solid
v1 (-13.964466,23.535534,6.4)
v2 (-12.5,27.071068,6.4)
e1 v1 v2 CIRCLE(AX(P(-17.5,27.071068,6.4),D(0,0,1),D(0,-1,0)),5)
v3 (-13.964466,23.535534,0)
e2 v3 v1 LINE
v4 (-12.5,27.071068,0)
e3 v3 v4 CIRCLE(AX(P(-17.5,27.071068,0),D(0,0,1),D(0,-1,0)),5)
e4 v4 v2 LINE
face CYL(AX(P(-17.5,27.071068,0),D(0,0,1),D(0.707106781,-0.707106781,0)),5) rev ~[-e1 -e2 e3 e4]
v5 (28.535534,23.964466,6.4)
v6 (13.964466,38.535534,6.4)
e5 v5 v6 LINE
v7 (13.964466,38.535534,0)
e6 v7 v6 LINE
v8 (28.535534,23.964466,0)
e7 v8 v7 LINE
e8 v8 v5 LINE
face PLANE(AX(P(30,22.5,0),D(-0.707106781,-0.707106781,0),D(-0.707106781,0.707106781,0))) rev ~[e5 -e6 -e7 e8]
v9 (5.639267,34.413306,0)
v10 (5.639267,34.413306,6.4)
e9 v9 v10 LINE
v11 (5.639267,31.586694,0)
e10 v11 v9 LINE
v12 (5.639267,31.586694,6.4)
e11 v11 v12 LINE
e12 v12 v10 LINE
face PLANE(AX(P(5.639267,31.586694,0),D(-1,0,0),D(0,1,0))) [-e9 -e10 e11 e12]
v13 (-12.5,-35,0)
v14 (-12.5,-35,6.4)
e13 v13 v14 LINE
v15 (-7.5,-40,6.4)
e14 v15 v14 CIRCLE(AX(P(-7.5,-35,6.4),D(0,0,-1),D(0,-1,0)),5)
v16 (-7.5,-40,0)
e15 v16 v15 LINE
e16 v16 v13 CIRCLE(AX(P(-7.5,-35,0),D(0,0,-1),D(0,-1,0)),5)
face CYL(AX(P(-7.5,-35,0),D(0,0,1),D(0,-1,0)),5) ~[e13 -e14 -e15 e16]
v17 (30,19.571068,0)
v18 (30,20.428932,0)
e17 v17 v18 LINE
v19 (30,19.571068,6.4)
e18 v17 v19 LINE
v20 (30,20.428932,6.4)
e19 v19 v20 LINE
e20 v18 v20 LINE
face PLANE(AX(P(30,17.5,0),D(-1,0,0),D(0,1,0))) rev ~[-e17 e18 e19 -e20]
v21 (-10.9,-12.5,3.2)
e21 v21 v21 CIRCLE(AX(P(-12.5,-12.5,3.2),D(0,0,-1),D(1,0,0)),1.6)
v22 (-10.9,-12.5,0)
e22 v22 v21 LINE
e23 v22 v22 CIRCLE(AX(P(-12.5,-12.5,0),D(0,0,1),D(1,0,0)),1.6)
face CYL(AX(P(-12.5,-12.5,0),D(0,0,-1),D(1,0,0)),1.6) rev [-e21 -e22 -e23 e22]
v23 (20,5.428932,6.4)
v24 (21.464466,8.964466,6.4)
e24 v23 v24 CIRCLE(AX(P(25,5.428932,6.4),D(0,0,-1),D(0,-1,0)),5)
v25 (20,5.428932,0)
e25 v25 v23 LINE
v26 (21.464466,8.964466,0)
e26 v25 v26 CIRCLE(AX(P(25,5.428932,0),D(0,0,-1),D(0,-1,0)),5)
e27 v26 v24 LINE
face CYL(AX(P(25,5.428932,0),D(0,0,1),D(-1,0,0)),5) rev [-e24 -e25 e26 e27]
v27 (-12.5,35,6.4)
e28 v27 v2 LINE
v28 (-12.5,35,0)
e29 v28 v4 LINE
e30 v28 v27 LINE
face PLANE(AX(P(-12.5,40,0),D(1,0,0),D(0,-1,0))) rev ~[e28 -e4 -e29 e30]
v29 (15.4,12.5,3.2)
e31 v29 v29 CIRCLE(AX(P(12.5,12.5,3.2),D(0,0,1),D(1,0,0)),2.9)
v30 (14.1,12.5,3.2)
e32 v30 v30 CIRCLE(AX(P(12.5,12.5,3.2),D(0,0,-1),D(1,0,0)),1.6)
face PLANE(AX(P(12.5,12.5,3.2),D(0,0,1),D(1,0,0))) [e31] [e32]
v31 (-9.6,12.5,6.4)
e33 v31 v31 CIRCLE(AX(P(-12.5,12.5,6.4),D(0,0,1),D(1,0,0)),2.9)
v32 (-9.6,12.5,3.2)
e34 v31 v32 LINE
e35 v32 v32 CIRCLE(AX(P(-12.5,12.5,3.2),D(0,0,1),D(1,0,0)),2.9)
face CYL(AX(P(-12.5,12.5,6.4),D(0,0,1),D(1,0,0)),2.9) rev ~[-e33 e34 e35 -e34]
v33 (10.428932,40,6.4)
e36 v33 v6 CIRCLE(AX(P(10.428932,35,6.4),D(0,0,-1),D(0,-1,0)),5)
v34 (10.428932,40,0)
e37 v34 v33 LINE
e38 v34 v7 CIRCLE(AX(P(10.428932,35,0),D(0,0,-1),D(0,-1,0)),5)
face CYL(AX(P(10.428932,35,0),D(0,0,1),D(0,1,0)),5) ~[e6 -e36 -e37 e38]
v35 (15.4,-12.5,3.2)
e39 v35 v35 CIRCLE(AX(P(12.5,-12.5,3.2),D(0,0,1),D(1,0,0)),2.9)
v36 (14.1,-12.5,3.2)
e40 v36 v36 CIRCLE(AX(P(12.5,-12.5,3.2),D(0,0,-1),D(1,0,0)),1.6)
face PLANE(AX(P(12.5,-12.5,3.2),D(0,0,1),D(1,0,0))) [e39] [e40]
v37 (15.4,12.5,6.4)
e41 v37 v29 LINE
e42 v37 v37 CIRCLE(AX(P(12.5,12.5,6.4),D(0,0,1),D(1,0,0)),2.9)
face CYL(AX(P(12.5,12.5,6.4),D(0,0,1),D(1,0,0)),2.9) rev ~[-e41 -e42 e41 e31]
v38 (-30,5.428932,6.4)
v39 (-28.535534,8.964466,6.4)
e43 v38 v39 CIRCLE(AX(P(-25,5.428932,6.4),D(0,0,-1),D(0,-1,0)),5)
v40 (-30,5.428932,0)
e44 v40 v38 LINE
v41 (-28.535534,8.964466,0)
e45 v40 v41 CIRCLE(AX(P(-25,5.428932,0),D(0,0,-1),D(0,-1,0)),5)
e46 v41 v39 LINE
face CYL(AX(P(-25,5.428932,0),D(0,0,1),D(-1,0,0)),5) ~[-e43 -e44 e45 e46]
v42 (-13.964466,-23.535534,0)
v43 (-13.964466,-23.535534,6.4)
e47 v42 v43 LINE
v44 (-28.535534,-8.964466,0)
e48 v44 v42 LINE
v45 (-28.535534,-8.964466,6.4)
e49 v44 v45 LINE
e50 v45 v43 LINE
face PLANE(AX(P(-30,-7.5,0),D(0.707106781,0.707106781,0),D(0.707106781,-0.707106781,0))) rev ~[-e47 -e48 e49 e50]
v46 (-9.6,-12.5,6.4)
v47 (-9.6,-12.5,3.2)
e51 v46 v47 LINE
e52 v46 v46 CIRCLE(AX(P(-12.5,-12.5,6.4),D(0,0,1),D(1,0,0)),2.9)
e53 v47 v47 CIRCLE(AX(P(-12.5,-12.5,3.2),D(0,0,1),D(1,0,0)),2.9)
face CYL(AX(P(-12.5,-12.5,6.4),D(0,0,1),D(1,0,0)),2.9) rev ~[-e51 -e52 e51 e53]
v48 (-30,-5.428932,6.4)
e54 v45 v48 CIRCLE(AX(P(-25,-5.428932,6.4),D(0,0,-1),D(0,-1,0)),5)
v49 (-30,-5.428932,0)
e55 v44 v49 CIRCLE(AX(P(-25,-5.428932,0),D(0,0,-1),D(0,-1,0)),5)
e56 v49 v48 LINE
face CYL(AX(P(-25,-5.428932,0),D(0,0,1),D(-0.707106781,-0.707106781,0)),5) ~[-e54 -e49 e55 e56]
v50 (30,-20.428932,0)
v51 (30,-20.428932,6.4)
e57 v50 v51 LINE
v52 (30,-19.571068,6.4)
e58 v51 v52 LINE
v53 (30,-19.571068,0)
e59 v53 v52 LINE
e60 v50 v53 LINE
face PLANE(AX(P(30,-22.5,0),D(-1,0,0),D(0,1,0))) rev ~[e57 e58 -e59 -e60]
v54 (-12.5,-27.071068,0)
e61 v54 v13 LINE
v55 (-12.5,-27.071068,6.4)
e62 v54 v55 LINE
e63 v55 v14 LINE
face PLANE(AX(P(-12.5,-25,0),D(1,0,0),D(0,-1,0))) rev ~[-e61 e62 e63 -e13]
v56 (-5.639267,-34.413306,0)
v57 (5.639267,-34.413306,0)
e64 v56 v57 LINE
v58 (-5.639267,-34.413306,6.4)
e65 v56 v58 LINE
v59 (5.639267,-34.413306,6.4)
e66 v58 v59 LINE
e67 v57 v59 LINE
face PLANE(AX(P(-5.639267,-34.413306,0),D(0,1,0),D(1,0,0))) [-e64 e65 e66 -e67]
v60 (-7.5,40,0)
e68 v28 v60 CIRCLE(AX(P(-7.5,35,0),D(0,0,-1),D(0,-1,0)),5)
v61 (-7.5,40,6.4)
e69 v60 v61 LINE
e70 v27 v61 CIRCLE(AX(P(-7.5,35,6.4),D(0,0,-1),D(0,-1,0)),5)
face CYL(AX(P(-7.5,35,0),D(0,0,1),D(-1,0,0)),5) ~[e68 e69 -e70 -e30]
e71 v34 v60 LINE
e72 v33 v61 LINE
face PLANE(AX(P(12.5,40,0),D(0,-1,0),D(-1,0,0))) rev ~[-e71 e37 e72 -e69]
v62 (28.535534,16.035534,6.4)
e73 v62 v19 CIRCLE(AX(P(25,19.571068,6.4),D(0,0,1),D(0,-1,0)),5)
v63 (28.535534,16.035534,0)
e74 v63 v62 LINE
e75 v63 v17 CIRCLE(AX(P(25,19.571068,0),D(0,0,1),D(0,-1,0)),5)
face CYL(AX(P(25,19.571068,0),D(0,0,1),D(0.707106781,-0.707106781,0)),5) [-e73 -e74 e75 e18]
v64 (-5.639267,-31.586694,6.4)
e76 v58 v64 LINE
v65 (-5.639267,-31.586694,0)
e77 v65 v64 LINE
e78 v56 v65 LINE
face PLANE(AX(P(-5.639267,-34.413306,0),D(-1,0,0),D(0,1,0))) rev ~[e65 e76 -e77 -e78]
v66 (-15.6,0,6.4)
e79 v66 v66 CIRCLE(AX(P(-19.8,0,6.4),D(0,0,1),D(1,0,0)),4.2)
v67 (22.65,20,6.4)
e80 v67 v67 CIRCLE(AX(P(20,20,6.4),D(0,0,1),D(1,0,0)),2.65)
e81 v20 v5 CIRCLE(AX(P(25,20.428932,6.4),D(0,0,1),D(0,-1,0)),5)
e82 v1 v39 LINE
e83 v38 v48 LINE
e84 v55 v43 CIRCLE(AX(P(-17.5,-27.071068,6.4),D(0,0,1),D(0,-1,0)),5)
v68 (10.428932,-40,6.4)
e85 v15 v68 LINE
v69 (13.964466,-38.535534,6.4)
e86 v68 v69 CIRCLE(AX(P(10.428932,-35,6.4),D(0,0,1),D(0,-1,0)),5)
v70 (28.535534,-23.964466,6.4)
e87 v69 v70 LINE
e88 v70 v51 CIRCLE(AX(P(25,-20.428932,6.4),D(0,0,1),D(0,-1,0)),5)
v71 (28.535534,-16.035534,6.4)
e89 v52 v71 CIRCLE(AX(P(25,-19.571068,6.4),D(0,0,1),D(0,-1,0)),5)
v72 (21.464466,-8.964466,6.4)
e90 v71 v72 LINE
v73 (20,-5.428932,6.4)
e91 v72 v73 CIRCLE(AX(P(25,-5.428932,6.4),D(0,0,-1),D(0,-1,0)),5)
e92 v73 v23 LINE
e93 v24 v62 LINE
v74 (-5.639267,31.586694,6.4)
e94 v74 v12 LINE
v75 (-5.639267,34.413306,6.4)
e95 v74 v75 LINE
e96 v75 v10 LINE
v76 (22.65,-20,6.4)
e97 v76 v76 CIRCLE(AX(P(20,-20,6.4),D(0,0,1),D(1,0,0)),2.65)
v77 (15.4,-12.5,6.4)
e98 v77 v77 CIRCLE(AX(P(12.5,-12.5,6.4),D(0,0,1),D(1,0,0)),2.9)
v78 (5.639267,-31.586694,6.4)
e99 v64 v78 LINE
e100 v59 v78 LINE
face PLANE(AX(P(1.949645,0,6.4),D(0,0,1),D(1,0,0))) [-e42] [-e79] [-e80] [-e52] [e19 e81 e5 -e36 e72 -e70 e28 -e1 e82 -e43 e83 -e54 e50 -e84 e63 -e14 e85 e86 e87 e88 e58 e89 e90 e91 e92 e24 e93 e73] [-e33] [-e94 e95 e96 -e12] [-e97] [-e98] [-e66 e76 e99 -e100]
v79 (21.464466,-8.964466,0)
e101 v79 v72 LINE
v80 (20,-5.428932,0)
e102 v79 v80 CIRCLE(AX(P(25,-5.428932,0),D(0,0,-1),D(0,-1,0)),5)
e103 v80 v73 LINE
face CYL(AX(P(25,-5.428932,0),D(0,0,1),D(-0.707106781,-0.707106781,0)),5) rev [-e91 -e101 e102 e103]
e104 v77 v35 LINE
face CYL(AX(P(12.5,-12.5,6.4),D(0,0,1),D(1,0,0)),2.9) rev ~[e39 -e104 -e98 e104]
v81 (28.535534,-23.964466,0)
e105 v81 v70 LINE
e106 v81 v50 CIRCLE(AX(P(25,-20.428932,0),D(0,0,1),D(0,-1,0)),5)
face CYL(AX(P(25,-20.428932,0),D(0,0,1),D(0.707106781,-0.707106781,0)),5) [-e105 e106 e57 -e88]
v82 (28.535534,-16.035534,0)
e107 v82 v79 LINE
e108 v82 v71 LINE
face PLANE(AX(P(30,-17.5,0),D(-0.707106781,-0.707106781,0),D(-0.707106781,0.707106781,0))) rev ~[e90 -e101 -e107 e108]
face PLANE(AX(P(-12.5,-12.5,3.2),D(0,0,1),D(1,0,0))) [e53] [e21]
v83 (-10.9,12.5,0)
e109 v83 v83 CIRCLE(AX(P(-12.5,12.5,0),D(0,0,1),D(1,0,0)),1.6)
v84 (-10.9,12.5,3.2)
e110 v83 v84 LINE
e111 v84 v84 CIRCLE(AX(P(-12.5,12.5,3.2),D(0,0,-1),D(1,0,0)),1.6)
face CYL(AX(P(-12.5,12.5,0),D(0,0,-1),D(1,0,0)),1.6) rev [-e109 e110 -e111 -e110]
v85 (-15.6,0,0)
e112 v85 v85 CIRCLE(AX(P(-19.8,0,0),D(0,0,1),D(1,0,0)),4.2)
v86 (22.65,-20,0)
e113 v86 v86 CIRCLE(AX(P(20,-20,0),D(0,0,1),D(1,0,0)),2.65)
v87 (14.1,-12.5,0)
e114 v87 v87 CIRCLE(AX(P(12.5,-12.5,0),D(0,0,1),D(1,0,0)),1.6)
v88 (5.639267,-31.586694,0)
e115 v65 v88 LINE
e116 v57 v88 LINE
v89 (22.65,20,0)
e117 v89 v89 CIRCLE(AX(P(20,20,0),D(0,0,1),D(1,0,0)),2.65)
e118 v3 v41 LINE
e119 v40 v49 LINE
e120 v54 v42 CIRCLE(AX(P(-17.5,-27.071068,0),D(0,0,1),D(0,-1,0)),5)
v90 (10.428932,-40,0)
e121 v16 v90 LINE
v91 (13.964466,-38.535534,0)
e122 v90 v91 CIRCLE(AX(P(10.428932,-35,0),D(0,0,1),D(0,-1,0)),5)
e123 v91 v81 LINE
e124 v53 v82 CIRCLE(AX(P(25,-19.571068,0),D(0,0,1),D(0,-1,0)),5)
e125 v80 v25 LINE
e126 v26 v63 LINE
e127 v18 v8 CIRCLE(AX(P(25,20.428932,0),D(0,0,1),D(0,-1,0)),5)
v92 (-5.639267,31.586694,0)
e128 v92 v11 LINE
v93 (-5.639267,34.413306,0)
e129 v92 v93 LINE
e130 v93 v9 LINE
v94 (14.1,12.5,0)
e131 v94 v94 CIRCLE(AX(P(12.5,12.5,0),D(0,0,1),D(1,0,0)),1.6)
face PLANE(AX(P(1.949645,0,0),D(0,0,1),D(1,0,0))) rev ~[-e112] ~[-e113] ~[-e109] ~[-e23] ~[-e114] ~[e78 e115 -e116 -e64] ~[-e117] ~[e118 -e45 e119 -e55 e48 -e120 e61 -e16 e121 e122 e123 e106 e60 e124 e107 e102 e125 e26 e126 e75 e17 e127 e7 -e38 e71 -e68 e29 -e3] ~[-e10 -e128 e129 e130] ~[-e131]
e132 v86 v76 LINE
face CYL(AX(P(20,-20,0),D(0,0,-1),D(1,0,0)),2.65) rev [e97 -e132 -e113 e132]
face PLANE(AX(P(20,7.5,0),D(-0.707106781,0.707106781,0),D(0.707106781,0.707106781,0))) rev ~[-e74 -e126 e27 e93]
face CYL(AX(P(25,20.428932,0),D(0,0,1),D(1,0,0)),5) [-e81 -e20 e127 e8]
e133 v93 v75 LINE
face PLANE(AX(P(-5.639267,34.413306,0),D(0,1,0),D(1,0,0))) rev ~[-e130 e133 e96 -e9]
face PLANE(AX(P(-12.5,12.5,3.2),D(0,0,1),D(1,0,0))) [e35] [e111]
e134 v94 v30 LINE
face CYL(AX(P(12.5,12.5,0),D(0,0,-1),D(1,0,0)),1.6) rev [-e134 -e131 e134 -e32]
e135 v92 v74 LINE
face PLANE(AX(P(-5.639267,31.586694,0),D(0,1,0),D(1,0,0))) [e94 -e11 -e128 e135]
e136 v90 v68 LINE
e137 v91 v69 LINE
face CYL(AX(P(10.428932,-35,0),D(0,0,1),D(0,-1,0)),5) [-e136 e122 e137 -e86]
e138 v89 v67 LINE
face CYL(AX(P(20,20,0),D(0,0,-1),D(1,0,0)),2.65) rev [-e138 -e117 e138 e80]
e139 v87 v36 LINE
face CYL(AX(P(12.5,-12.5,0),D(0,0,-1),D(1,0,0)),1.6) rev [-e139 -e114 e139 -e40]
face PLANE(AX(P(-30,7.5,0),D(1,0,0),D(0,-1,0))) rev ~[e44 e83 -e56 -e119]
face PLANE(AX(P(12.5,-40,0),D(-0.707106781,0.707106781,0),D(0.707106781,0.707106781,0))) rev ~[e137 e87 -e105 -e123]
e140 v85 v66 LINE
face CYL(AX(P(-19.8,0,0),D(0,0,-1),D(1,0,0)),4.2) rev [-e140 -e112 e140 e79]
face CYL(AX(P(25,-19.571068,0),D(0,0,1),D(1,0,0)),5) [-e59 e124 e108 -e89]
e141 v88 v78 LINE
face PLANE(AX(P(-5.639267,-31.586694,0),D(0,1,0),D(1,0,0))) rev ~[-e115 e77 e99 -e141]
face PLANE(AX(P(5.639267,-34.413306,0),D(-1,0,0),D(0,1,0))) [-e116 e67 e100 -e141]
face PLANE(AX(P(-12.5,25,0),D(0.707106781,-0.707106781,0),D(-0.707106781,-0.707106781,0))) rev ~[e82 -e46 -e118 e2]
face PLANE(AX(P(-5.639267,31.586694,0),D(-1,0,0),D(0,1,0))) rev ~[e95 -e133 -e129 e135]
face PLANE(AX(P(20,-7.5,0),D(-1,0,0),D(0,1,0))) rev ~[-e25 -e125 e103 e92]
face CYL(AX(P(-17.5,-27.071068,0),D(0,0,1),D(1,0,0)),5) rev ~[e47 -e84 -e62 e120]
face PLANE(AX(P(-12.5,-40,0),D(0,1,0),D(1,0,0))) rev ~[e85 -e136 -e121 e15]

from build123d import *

# Parameters (mm, degrees)
F0_R     = 1.6
F0_W     = 11.2785340156
F0_H     = 2.8266120087
F0_R_2   = 2.65
F0_R_3   = 4.2
F1_DEPTH = 6.4
F2_R     = 5
F3_R     = 2.9
F4_DEPTH = 3.2


# Not quite as in the source:
# - a feature names something its author has since deleted; it is built from what else it names


with BuildPart() as f1:
    # F0 (on Top) → F1 (new body)
    with BuildSketch(Plane.XY):
        Polygon((-12.5, -40), (12.5, -40), (30, -22.5), (30, -17.5), (20, -7.5), (20, 7.5), (30, 17.5), (30, 22.5), (12.5, 40), (-12.5, 40), (-12.5, 25), (-30, 7.5), (-30, -7.5), (-12.5, -25), align=None)
        with Locations((-12.5, -12.5)):
            Circle(F0_R, mode=Mode.SUBTRACT)
        with Locations((0, -33)):
            Rectangle(F0_W, F0_H, mode=Mode.SUBTRACT)
        with Locations((12.5, -12.5)):
            Circle(F0_R, mode=Mode.SUBTRACT)
        with Locations((20, -20)):
            Circle(F0_R_2, mode=Mode.SUBTRACT)
        with Locations((-19.8, 0)):
            Circle(F0_R_3, mode=Mode.SUBTRACT)
        with Locations((-12.5, 12.5)):
            Circle(F0_R, mode=Mode.SUBTRACT)
        with Locations((12.5, 12.5)):
            Circle(F0_R, mode=Mode.SUBTRACT)
        with Locations((0, 33)):
            Rectangle(F0_W, F0_H, mode=Mode.SUBTRACT)
        with Locations((20, 20)):
            Circle(F0_R_2, mode=Mode.SUBTRACT)
    extrude(amount=F1_DEPTH)

    # F2
    f2_edges = [f1.edges().sort_by_distance(p)[0] for p in [
        (30, 17.5, 3.2),
        (30, 22.5, 3.2),
        (-12.5, -25, 3.2),
        (-12.5, 25, 3.2),
        (-12.5, -40, 3.2),
        (12.5, -40, 3.2),
        (30, -22.5, 3.2),
        (30, -17.5, 3.2),
        (20, -7.5, 3.2),
        (20, 7.5, 3.2),
        (12.5, 40, 3.2),
        (-12.5, 40, 3.2),
        (-30, 7.5, 3.2),
        (-30, -7.5, 3.2),
    ]]
    fillet(f2_edges, radius=F2_R)

    # F3 (on face) → F4 (cut)
    with BuildSketch(Plane.XY.offset(6.4)):
        with Locations((-12.5, 12.5)):
            Circle(F3_R)
        with Locations((12.5, 12.5)):
            Circle(F3_R)
        with Locations((12.5, -12.5)):
            Circle(F3_R)
        with Locations((-12.5, -12.5)):
            Circle(F3_R)
    extrude(amount=-F4_DEPTH, mode=Mode.SUBTRACT)


solid = f1.part
